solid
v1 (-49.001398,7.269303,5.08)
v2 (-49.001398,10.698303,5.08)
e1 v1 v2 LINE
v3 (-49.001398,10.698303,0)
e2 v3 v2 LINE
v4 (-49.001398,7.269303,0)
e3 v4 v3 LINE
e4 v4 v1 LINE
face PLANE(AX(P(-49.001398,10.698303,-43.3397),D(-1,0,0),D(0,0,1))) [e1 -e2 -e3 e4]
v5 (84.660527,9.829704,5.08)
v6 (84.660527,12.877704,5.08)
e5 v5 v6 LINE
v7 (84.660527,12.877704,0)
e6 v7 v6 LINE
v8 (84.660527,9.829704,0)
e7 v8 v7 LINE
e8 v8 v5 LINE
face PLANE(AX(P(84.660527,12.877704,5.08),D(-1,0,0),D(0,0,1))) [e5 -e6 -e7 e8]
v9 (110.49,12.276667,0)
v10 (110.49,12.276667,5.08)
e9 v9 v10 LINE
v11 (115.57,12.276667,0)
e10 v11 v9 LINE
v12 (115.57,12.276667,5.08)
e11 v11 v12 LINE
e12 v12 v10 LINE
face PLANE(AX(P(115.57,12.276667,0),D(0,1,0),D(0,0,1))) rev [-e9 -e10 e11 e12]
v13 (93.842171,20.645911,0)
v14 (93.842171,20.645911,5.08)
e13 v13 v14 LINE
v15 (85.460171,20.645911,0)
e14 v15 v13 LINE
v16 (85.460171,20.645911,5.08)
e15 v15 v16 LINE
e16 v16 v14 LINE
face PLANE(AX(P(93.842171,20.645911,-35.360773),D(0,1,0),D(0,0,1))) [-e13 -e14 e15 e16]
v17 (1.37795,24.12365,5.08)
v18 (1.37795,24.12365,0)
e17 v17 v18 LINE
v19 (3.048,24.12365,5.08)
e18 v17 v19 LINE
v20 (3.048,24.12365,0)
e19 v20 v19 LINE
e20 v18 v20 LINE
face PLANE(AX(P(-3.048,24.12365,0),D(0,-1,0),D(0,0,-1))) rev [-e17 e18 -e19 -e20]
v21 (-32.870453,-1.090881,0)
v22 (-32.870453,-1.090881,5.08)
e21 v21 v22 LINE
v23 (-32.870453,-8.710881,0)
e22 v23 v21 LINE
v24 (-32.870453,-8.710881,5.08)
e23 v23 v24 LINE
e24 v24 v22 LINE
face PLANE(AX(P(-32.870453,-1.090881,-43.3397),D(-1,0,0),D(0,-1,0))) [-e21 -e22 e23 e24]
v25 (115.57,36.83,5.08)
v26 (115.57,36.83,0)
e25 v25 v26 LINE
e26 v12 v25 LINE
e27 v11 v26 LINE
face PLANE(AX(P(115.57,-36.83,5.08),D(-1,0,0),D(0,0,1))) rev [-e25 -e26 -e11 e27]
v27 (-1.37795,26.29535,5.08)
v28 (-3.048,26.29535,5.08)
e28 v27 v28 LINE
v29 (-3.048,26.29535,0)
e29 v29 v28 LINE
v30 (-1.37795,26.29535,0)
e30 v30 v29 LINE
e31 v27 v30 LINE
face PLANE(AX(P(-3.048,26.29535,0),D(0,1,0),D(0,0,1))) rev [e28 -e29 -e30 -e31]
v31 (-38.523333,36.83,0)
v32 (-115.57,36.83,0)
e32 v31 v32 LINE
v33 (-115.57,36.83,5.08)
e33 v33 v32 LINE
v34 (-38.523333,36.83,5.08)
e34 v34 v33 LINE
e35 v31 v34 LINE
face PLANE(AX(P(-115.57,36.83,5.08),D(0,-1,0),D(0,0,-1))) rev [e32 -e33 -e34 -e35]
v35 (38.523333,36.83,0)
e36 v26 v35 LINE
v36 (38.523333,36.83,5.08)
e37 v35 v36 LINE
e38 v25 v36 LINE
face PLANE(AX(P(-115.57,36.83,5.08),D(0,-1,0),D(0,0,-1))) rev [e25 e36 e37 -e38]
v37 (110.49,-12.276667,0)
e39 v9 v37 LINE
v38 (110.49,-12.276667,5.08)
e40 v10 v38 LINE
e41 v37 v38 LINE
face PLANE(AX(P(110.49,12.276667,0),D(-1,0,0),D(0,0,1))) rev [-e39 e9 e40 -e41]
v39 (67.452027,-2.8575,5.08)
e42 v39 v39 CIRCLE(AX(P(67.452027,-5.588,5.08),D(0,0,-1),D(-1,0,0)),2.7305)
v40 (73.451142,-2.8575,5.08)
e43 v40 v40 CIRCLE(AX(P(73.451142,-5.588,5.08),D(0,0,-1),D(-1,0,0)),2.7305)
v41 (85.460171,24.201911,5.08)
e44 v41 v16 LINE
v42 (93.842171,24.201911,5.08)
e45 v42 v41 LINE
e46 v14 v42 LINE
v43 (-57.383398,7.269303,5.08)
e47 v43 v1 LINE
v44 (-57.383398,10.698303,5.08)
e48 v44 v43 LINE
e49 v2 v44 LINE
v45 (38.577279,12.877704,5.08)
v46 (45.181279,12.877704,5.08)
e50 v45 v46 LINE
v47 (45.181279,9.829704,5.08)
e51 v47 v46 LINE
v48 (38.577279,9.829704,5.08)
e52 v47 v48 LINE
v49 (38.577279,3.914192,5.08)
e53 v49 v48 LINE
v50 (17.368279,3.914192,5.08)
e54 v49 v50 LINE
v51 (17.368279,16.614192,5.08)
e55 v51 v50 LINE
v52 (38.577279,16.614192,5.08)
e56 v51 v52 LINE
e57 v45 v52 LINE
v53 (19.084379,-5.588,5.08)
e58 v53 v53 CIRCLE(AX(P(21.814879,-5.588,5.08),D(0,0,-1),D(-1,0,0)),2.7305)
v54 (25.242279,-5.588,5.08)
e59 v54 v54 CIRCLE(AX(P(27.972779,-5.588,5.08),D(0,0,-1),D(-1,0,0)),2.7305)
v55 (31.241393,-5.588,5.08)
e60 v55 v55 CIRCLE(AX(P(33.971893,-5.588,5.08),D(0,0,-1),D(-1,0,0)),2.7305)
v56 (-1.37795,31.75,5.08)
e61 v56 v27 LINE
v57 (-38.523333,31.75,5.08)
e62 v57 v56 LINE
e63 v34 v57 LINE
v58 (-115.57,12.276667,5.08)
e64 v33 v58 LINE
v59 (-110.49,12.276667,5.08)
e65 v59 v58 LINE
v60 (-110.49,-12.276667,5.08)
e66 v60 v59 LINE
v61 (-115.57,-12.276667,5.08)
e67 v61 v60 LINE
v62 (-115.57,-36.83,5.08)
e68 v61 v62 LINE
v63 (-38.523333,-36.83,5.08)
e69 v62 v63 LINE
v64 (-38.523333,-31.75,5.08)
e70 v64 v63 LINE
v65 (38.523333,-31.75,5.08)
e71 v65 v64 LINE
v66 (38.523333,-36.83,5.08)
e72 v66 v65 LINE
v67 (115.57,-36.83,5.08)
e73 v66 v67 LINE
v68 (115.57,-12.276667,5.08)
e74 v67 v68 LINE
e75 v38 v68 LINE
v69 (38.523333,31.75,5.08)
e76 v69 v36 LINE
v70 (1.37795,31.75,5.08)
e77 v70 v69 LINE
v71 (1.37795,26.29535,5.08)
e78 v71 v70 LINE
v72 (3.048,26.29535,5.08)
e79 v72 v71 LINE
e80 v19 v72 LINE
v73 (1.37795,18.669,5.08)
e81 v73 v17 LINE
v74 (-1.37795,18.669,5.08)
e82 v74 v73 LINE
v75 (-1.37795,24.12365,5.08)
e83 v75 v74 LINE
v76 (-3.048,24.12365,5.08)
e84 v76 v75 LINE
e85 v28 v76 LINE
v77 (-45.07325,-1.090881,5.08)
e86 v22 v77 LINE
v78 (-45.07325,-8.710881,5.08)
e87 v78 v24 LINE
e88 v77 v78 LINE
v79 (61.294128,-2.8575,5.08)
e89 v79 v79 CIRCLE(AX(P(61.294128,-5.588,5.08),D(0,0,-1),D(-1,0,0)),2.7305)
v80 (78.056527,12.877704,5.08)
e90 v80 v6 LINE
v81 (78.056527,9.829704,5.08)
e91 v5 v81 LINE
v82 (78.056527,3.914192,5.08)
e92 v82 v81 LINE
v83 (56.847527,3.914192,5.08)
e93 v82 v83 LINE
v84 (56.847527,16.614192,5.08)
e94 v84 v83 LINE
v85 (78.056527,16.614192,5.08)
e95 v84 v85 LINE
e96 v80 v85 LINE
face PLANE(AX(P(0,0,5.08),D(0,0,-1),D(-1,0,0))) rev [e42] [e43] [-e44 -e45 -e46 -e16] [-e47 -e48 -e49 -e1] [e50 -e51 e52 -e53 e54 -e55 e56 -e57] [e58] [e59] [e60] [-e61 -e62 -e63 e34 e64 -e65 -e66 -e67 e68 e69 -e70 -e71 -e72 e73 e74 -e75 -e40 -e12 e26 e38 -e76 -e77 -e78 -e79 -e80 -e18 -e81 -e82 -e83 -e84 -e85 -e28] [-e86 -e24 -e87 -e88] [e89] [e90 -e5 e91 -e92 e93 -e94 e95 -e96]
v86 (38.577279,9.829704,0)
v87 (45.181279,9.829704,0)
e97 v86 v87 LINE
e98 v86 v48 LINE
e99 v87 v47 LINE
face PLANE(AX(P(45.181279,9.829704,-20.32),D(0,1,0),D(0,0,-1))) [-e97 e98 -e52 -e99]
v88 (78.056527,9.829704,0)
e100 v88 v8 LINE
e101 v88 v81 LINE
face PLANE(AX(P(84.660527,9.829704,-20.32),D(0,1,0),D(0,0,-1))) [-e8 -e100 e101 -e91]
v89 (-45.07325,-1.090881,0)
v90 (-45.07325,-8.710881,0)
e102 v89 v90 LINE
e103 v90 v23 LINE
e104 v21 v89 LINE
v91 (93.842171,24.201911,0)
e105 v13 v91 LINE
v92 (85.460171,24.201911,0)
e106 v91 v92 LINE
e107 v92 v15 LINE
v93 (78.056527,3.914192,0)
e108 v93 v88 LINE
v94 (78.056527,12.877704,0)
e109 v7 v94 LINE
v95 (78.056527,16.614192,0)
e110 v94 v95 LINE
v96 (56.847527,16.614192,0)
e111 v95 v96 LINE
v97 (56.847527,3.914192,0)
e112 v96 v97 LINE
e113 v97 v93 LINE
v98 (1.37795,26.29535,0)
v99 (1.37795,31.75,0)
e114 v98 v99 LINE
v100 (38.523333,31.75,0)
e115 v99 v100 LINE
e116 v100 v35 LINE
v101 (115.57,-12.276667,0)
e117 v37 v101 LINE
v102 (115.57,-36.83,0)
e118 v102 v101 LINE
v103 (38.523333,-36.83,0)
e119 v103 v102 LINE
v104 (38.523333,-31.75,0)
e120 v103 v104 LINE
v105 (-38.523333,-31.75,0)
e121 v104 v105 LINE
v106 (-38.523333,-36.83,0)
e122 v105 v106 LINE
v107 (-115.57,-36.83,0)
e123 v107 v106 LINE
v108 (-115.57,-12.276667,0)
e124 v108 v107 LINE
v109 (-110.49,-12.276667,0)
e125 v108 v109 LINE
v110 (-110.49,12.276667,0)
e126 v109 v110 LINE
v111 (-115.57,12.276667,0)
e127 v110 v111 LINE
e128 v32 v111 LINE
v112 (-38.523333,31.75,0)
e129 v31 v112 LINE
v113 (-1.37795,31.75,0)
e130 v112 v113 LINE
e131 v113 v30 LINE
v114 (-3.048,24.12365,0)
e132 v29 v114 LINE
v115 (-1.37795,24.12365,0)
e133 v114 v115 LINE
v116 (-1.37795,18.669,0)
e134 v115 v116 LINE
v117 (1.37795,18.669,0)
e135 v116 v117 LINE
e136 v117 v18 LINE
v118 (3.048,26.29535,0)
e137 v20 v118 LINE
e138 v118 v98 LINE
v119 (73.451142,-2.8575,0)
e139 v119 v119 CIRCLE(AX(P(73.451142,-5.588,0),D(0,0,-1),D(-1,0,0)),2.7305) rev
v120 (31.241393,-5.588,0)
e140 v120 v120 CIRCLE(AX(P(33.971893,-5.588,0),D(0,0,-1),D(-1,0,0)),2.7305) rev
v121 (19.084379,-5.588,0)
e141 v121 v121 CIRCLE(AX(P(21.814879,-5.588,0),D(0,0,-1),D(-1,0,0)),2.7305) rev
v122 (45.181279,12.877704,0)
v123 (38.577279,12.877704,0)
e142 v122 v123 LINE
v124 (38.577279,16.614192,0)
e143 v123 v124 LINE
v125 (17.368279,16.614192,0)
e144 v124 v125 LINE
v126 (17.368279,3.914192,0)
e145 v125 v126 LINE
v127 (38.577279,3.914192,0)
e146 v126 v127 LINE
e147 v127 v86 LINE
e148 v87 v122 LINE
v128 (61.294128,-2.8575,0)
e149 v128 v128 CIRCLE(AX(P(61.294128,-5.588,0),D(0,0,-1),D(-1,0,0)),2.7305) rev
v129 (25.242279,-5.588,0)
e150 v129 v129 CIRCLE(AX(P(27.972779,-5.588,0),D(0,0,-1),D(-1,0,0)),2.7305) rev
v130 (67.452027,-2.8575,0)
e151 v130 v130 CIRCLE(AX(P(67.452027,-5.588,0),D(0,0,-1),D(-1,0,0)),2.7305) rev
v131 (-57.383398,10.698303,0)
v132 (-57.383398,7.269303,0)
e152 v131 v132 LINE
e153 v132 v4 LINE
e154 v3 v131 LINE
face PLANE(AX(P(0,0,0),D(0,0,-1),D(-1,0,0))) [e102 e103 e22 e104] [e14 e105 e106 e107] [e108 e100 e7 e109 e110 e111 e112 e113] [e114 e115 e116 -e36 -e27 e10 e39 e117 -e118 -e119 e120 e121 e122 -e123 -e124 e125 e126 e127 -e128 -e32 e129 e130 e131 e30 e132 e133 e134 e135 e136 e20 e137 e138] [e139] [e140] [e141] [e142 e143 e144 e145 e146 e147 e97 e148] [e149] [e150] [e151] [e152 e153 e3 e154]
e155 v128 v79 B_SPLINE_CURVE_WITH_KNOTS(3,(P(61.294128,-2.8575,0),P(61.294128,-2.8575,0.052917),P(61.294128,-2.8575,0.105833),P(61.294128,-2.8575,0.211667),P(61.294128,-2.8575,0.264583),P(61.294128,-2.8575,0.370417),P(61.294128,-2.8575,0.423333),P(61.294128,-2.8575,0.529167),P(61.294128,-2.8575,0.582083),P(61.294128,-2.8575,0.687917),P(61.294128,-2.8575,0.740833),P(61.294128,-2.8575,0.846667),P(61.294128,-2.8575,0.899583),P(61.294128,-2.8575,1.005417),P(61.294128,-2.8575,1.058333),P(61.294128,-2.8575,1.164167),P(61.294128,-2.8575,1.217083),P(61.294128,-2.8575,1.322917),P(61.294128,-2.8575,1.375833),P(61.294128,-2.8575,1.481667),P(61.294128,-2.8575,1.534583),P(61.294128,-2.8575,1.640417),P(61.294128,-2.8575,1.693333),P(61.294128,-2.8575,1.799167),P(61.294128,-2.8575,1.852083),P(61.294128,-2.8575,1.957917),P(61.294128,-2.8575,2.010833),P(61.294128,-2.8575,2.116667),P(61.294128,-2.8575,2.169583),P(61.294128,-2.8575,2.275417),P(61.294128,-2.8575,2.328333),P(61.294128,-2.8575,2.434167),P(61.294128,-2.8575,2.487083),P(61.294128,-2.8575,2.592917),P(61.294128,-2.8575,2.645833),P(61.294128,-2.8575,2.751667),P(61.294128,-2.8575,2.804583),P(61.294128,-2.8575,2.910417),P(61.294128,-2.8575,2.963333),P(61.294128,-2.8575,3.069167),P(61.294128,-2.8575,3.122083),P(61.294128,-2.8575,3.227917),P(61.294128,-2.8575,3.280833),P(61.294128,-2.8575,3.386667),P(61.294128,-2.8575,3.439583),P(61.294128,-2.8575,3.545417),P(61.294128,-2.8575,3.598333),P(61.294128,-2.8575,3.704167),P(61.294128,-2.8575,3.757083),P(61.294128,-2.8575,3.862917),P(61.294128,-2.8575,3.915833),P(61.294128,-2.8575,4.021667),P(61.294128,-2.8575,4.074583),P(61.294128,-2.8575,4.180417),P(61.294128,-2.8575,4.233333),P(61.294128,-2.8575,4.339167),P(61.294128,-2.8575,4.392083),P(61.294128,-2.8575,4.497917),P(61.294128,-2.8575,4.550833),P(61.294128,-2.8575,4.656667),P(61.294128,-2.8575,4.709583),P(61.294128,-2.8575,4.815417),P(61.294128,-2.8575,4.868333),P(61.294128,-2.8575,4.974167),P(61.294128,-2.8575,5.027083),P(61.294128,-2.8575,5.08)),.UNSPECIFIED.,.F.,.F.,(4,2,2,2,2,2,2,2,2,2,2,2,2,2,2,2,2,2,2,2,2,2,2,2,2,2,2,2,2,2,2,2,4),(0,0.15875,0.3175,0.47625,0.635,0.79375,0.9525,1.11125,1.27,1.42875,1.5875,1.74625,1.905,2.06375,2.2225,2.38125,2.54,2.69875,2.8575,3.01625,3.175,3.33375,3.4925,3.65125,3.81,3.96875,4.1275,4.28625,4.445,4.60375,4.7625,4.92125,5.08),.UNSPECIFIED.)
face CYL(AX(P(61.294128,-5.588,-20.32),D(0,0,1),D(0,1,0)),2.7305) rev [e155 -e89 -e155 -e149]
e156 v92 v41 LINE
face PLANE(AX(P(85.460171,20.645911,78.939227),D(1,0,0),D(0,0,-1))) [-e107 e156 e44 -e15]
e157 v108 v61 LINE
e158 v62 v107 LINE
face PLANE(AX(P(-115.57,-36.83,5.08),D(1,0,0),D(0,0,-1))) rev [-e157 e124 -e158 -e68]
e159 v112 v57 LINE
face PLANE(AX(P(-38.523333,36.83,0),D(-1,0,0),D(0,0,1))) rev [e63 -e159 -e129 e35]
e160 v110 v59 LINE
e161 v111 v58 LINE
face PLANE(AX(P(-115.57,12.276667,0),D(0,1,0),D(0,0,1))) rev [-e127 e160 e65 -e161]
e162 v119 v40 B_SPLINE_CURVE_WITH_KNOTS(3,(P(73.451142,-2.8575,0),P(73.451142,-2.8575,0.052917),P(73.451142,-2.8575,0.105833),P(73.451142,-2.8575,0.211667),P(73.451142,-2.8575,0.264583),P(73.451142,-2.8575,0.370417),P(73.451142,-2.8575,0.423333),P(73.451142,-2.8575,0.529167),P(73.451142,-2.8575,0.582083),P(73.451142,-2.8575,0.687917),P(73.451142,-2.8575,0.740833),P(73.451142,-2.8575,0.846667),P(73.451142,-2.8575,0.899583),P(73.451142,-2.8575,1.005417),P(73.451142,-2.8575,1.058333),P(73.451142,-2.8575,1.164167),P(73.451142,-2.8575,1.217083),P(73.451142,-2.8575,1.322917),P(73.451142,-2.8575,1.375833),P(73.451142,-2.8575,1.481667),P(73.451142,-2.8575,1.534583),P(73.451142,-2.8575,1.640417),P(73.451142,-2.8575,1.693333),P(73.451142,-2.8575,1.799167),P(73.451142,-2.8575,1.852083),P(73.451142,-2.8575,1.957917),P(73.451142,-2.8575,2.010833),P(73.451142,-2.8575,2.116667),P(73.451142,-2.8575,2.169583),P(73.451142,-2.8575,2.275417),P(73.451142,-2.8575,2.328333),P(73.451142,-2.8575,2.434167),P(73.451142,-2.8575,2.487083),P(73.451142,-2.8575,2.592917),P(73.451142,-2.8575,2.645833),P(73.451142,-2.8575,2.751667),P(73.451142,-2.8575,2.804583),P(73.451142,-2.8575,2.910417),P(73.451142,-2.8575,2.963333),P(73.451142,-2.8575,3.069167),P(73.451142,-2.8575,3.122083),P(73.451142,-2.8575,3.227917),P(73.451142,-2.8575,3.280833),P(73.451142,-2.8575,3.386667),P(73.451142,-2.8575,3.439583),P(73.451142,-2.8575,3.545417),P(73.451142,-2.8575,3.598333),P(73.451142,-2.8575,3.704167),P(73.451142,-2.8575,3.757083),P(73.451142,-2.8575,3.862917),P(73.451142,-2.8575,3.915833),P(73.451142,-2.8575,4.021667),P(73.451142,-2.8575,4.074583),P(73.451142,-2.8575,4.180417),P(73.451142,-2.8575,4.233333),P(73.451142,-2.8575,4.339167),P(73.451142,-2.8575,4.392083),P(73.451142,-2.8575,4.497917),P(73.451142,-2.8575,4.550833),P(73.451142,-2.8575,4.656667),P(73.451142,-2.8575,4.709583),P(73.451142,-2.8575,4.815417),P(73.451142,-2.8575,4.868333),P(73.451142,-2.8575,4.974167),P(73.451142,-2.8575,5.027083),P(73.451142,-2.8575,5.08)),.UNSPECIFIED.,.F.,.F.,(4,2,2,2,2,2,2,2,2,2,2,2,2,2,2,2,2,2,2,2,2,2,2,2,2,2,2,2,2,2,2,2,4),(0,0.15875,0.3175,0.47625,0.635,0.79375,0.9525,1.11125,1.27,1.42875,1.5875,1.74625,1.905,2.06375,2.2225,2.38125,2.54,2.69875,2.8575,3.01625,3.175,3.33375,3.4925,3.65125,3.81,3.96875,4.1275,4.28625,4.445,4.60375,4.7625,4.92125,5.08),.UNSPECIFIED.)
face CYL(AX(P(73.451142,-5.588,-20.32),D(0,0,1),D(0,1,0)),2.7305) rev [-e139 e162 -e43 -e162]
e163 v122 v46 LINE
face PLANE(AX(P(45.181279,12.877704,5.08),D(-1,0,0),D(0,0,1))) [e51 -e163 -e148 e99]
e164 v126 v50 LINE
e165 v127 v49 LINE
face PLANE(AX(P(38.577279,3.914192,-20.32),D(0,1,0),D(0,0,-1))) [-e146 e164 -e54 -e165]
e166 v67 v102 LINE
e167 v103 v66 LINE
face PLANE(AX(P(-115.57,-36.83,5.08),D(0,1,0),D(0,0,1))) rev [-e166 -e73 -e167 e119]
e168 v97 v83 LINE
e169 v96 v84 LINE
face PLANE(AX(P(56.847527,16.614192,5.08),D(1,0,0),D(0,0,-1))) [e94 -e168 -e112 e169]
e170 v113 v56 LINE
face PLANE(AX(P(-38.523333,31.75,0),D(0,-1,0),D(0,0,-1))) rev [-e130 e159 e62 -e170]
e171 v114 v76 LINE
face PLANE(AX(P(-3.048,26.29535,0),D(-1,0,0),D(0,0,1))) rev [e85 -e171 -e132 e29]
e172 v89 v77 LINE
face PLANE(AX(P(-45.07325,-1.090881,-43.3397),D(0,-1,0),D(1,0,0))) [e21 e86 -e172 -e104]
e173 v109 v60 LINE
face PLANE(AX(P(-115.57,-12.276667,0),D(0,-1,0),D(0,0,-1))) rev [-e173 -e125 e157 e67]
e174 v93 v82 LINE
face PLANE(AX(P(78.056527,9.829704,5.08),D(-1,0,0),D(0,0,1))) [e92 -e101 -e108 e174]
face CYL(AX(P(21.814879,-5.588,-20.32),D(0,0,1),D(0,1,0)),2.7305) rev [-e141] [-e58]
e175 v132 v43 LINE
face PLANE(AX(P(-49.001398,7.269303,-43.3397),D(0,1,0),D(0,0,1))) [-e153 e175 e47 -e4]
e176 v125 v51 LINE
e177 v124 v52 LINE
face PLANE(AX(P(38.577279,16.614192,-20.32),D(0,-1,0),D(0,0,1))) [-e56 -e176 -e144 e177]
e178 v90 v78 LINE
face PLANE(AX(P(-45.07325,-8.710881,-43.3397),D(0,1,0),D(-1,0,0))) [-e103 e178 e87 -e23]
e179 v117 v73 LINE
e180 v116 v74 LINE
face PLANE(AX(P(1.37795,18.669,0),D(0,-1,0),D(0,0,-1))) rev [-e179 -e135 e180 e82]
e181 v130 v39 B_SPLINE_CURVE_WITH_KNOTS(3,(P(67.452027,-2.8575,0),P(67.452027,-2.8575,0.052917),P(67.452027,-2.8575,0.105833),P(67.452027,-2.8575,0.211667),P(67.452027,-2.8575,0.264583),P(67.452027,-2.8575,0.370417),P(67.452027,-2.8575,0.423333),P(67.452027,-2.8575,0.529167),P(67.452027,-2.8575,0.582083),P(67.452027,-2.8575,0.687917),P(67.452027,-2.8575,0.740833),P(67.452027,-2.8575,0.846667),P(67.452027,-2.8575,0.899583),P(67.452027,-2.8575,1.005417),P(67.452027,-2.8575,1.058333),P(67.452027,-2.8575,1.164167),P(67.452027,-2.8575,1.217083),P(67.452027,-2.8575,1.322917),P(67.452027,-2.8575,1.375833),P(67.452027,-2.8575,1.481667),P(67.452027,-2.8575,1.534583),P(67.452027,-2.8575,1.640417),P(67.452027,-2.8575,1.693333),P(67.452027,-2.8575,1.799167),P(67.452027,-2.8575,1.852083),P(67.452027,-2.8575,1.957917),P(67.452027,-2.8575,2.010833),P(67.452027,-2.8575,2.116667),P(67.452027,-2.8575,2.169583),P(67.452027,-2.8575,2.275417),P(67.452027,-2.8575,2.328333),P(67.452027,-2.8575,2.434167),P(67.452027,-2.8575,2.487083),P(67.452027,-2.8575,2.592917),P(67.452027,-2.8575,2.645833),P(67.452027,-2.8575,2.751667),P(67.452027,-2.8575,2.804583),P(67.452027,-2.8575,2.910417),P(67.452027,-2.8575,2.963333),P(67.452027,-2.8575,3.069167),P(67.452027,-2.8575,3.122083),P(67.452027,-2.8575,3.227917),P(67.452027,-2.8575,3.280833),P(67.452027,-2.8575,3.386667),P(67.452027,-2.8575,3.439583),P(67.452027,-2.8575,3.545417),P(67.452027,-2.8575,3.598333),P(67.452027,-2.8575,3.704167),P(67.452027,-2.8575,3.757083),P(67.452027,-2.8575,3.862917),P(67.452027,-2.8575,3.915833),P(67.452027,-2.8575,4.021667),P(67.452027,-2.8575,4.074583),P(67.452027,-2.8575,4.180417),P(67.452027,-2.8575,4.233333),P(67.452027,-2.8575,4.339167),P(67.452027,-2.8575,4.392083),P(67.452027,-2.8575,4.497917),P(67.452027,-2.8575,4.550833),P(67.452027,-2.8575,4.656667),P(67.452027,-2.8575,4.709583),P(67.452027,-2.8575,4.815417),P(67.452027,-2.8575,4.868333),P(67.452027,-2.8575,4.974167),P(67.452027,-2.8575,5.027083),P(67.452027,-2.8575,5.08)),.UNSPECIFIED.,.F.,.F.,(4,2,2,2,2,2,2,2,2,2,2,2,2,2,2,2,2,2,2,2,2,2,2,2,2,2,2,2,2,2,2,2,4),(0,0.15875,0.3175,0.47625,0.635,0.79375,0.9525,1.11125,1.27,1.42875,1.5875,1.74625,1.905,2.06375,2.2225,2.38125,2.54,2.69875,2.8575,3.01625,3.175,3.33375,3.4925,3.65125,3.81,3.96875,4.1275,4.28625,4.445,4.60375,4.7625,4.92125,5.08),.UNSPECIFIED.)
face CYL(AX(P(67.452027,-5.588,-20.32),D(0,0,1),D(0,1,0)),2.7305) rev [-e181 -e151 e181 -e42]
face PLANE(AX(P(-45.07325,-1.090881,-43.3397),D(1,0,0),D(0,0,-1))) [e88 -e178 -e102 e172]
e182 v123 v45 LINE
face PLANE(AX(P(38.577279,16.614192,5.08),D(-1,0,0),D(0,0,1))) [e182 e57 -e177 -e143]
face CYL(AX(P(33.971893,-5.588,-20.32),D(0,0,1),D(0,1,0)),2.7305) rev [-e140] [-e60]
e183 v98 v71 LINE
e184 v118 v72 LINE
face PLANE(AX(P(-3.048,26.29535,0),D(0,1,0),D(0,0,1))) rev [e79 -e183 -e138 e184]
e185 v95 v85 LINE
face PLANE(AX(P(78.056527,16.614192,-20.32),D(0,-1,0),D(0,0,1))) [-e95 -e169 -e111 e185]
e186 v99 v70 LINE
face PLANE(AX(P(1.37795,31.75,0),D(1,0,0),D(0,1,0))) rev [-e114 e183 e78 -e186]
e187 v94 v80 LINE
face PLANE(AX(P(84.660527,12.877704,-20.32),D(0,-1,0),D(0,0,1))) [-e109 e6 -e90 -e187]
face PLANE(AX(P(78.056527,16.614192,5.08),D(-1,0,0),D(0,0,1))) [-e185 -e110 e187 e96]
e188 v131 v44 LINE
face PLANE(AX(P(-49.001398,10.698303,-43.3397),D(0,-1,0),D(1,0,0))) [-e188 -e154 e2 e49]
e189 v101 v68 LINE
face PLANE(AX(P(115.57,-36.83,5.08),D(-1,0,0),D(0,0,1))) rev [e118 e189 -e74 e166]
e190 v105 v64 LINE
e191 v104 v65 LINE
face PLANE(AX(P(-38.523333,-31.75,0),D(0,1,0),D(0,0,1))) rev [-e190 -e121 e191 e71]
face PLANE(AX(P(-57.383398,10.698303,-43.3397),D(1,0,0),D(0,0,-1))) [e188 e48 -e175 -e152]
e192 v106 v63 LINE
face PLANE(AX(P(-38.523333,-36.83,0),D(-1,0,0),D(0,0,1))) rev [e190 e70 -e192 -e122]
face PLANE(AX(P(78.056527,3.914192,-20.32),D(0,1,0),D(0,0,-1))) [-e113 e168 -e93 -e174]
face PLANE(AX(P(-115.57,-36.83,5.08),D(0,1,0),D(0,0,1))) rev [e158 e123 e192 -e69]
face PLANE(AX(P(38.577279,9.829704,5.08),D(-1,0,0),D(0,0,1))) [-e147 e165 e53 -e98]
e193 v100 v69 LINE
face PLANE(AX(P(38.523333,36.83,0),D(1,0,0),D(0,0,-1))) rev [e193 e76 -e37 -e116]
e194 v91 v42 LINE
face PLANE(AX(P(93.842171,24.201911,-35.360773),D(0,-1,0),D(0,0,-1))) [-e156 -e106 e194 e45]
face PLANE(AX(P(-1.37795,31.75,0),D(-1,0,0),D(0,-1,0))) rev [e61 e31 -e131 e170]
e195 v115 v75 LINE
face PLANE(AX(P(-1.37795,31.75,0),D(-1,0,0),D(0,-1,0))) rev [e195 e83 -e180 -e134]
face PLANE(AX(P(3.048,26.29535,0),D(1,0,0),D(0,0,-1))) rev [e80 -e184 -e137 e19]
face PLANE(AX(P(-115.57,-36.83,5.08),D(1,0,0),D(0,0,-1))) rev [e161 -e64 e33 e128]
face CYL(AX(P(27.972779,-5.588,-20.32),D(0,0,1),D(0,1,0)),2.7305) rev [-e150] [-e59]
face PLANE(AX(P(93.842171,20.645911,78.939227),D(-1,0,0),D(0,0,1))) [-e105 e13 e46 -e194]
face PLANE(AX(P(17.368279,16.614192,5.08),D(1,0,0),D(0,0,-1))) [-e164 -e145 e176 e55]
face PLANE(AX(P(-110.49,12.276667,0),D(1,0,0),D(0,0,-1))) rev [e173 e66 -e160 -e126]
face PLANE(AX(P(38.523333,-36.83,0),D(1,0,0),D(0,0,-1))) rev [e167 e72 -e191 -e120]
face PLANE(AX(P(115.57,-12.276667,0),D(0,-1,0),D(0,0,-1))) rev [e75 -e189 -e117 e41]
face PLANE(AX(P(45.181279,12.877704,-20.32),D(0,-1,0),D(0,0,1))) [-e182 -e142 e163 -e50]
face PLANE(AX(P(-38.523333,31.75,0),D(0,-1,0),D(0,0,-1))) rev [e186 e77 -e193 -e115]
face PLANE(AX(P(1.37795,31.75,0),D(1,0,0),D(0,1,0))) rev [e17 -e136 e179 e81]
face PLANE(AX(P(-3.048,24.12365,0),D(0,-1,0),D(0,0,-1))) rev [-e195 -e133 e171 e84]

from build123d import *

# Parameters (mm, degrees)
SKETCH1_W           = 231.14
SKETCH1_H           = 73.66
BOSS_EXTRUDE1_DEPTH = 5.08
SKETCH2_W           = 77.046666666
SKETCH2_H           = 5.08
CUT_EXTRUDE1_DEPTH  = 122.402966191
SKETCH3_W           = 5.08
SKETCH3_H           = 24.553333334
CUT_EXTRUDE2_DEPTH  = 122.402966191
SKETCH5_W           = 2.7559
SKETCH5_H           = 13.081
CUT_EXTRUDE4_DEPTH  = 122.402966191
SKETCH6_W           = 6.096
SKETCH6_H           = 2.1717
CUT_EXTRUDE5_DEPTH  = 122.402966191
CAVITY1_OUTLINE_R   = 2.7305
CAVITY1_OUTLINE_W   = 12.202797109
CAVITY1_OUTLINE_H   = 7.62
CAVITY1_OUTLINE_W_2 = 8.382
CAVITY1_OUTLINE_H_2 = 3.429
CAVITY1_OUTLINE_H_3 = 3.556
CAVITY1_DEPTH       = 5.08


# Read off the part's stored shape, not the designer's step: Cavity1
with BuildPart() as part:
    # Sketch1 → Boss-Extrude1 (new body)
    with BuildSketch(Plane.XY):
        Rectangle(SKETCH1_W, SKETCH1_H)
    extrude(amount=BOSS_EXTRUDE1_DEPTH)

    # Sketch2 → Cut-Extrude1 (cut, through all)
    with BuildSketch(Plane.XY.offset(5.08)):
        with Locations((0, -34.29)):
            Rectangle(SKETCH2_W, SKETCH2_H)
        with Locations((0, 34.29)):
            Rectangle(SKETCH2_W, SKETCH2_H)
    extrude(amount=-CUT_EXTRUDE1_DEPTH, mode=Mode.SUBTRACT)

    # Sketch3 → Cut-Extrude2 (cut, through all)
    with BuildSketch(Plane.XY.offset(5.08)):
        with Locations((-113.03, 0)):
            Rectangle(SKETCH3_W, SKETCH3_H)
        with Locations((113.03, 0)):
            Rectangle(SKETCH3_W, SKETCH3_H)
    extrude(amount=-CUT_EXTRUDE2_DEPTH, mode=Mode.SUBTRACT)

    # Sketch5 → Cut-Extrude4 (cut, through all)
    with BuildSketch(Plane.XY.offset(5.08)):
        with Locations((0, 25.2095)):
            Rectangle(SKETCH5_W, SKETCH5_H)
    extrude(amount=-CUT_EXTRUDE4_DEPTH, mode=Mode.SUBTRACT)

    # Sketch6 → Cut-Extrude5 (cut, through all)
    with BuildSketch(Plane.XY.offset(5.08)):
        with Locations((0, 25.2095)):
            Rectangle(SKETCH6_W, SKETCH6_H)
    extrude(amount=-CUT_EXTRUDE5_DEPTH, mode=Mode.SUBTRACT)

    # Cavity1 outline → Cavity1 (cut)
    with BuildSketch(Plane.XY):
        with Locations((21.814879295, -5.588)):
            Circle(CAVITY1_OUTLINE_R)
        with Locations((27.972778565, -5.588)):
            Circle(CAVITY1_OUTLINE_R)
        with Locations((33.971893142, -5.588)):
            Circle(CAVITY1_OUTLINE_R)
        Polygon((38.577278565, 12.877703873), (38.577278565, 16.614191805), (17.368278565, 16.614191805), (17.368278565, 3.914191805), (38.577278565, 3.914191805), (38.577278565, 9.829703873), (45.181278565, 9.829703873), (45.181278565, 12.877703873), align=None)
        Polygon((56.847527144, 3.914191805), (78.056527144, 3.914191805), (78.056527144, 9.829703873), (84.660527144, 9.829703873), (84.660527144, 12.877703873), (78.056527144, 12.877703873), (78.056527144, 16.614191805), (56.847527144, 16.614191805), align=None)
        with Locations((61.294127875, -5.588)):
            Circle(CAVITY1_OUTLINE_R)
        with Locations((67.452027144, -5.588)):
            Circle(CAVITY1_OUTLINE_R)
        with Locations((73.451141721, -5.588)):
            Circle(CAVITY1_OUTLINE_R)
        with Locations((-38.971851196, -4.900880915)):
            Rectangle(CAVITY1_OUTLINE_W, CAVITY1_OUTLINE_H)
        with Locations((-53.192397728, 8.983802784)):
            Rectangle(CAVITY1_OUTLINE_W_2, CAVITY1_OUTLINE_H_2)
        with Locations((89.651170694, 22.423911141)):
            Rectangle(CAVITY1_OUTLINE_W_2, CAVITY1_OUTLINE_H_3)
    extrude(amount=CAVITY1_DEPTH, mode=Mode.SUBTRACT)


solid = part.part
